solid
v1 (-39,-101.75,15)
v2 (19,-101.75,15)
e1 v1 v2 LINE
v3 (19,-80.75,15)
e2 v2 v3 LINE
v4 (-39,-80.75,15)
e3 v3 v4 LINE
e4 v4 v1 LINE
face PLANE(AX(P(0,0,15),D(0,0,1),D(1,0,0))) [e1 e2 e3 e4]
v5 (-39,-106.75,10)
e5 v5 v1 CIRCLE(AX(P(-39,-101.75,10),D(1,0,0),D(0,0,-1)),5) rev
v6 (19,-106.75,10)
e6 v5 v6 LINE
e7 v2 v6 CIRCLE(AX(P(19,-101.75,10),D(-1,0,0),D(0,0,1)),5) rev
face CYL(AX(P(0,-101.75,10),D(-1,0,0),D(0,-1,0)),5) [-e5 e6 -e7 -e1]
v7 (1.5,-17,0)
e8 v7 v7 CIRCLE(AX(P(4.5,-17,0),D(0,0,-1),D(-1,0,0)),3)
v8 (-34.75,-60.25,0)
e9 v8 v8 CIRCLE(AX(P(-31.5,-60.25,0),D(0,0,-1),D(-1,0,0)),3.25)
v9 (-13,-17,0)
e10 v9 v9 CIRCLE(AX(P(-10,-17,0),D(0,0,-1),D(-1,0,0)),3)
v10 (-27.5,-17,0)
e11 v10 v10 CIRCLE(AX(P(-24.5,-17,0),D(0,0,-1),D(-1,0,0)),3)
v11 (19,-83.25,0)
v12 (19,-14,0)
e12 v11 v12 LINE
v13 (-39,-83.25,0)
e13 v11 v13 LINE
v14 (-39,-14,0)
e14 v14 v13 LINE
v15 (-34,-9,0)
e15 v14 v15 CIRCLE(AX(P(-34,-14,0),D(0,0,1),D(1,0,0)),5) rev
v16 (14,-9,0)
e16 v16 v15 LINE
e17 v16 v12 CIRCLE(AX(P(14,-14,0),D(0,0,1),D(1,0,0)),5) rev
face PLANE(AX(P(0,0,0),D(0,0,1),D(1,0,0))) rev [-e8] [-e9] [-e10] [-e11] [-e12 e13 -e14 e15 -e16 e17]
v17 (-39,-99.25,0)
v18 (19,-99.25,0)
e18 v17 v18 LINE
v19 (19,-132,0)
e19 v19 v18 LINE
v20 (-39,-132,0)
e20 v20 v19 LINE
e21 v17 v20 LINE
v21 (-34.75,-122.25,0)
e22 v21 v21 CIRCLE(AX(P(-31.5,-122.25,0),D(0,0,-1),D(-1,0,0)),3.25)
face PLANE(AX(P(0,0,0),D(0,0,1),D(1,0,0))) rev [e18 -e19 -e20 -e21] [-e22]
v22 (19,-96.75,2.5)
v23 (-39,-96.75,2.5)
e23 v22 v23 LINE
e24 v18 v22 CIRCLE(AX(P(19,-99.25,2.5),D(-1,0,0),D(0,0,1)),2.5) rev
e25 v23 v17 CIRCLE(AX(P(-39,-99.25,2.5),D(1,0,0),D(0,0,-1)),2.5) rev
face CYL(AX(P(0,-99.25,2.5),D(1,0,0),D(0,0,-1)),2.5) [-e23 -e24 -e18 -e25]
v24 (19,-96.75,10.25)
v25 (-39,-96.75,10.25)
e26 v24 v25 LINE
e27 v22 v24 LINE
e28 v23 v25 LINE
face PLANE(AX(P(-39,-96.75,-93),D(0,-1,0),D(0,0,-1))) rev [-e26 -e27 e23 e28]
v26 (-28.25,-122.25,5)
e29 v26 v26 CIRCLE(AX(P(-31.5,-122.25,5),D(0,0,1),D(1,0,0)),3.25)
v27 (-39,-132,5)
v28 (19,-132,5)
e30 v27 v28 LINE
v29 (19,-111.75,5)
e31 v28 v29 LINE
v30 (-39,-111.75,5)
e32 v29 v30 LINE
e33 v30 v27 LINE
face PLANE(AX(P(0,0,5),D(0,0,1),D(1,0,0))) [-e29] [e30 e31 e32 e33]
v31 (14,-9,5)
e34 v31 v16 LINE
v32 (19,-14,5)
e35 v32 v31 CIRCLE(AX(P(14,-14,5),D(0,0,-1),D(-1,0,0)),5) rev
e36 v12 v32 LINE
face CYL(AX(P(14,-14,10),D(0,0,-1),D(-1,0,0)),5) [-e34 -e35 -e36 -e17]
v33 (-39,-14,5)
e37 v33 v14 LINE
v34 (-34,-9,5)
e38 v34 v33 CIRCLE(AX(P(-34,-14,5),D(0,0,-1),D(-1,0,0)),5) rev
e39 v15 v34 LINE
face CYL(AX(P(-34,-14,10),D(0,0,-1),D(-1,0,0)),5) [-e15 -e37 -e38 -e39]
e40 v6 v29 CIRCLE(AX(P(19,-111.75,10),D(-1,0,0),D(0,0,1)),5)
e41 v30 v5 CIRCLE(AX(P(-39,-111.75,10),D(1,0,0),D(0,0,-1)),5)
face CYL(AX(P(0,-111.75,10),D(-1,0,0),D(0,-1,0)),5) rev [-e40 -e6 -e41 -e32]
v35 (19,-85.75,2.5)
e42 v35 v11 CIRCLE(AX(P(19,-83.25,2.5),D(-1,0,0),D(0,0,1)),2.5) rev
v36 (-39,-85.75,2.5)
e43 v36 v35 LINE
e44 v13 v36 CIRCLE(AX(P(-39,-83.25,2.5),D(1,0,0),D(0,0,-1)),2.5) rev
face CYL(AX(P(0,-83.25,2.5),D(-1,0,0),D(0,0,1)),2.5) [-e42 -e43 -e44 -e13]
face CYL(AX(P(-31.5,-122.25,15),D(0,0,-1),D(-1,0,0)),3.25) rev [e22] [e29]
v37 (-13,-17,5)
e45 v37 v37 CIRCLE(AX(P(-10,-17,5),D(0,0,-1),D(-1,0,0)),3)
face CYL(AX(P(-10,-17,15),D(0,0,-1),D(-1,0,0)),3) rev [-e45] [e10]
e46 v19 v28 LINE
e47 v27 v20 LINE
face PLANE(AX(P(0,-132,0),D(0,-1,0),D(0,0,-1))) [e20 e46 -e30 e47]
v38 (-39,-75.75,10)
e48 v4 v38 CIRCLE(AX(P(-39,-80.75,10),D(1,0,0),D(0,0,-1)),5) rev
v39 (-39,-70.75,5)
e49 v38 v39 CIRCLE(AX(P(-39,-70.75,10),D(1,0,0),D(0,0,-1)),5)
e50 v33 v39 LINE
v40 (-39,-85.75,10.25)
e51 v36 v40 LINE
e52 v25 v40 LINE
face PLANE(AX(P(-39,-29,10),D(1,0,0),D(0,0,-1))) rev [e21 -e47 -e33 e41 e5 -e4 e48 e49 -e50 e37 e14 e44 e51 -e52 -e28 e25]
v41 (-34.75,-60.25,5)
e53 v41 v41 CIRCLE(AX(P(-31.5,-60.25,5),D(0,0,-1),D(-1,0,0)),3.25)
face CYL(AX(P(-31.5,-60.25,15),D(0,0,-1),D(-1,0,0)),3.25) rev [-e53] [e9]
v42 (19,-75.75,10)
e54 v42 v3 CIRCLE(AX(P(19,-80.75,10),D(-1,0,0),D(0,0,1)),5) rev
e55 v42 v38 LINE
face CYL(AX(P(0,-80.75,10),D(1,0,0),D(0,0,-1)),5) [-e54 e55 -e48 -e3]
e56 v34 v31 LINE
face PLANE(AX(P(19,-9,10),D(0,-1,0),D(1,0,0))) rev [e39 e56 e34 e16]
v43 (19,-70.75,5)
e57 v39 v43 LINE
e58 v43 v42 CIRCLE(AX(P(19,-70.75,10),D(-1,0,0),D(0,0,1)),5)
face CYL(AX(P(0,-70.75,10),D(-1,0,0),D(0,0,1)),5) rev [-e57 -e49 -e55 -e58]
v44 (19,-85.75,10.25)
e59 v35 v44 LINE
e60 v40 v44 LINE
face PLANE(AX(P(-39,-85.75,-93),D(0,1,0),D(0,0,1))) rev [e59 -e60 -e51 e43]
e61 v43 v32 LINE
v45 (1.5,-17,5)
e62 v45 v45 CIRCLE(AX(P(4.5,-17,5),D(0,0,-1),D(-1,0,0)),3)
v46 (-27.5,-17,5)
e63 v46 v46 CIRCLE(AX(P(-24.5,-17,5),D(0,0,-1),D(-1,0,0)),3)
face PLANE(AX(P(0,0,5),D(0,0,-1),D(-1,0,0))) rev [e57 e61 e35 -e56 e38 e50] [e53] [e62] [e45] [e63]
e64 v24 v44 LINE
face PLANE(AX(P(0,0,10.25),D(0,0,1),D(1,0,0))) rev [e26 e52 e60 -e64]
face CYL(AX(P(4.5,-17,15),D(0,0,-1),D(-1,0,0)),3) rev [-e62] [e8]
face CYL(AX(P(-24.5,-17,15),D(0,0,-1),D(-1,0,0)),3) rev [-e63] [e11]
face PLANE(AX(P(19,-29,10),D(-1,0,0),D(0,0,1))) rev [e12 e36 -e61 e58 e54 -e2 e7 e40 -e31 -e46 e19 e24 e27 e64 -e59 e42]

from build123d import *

# Parameters (mm, degrees)
SKETCH1_W           = 58
SKETCH1_H           = 20
BOSS_EXTRUDE1_DEPTH = 10
SKETCH2_W           = 58
SKETCH2_H           = 10
BOSS_EXTRUDE3_DEPTH = 103
SKETCH4_W           = 58
SKETCH4_H           = 11
CUT_EXTRUDE2_DEPTH  = 103
SKETCH5_W           = 58
SKETCH5_H           = 31
BOSS_EXTRUDE4_DEPTH = 5
SKETCH6_W           = 58
SKETCH6_H           = 66.819677738
SKETCH6_W_2         = 58.198762754
SKETCH6_H_2         = 25.25
CUT_EXTRUDE3_DEPTH  = 5
FILLET2_START       = -39
FILLET2_DEPTH       = 58
FILLET2_2_DEPTH     = 58
FILLET3_R           = 2.5
SKETCH7_W           = 58.063983185
SKETCH7_H           = 11
CUT_EXTRUDE4_DEPTH  = 0.25
SKETCH9_R           = 3
SKETCH9_R_2         = 3.25
CUT_EXTRUDE5_DEPTH  = 139.455769111
FILLET4_R           = 5


with BuildPart() as part:
    # Sketch1 → Boss-Extrude1 (new body)
    with BuildSketch(Plane.XY):
        with Locations((-10, -19)):
            Rectangle(SKETCH1_W, SKETCH1_H)
    extrude(amount=BOSS_EXTRUDE1_DEPTH)

    # Sketch2 → Boss-Extrude3 (add)
    with BuildSketch(Plane.XZ.offset(29)):
        with Locations((-10, 5)):
            Rectangle(SKETCH2_W, SKETCH2_H)
    extrude(amount=BOSS_EXTRUDE3_DEPTH)

    # Sketch4 → Cut-Extrude2 (cut)
    with BuildSketch(Plane.XY.offset(10)):
        with Locations((-10, -91.25)):
            Rectangle(SKETCH4_W, SKETCH4_H)
    extrude(amount=-CUT_EXTRUDE2_DEPTH, mode=Mode.SUBTRACT)


with BuildPart() as cut_extrude2_piece_1:
    # of the separate pieces the step leaves, piece 1, a body of its own (cut_extrude2_pieces)
    add(part.part.solids().sort_by_distance((-39, -9, 0))[0])



with BuildPart() as cut_extrude2_piece_2:
    # of the separate pieces the step leaves, piece 2, a body of its own (cut_extrude2_pieces)
    add(part.part.solids().sort_by_distance((-39, -96.75, 10))[0])


with BuildPart() as cut_extrude2_piece_1_1:
    add(cut_extrude2_piece_1.part)

    add(cut_extrude2_piece_2.part)  # Boss-Extrude4 merges Cut-Extrude2 piece 2
    # Sketch5 → Boss-Extrude4 (add)
    with BuildSketch(Plane.XY.offset(10)):
        with Locations((-10, -91.25)):
            Rectangle(SKETCH5_W, SKETCH5_H)
    extrude(amount=BOSS_EXTRUDE4_DEPTH)

    # Sketch6 → Cut-Extrude3 (cut)
    with BuildSketch(Plane.XY.offset(10)):
        with Locations((-10, -42.340161131)):
            Rectangle(SKETCH6_W, SKETCH6_H)
        with Locations((-9.900618623, -119.375)):
            Rectangle(SKETCH6_W_2, SKETCH6_H_2)
    extrude(amount=-CUT_EXTRUDE3_DEPTH, mode=Mode.SUBTRACT)

    # Fillet2: read off the stored shape, not the designer's step
    # Fillet2 outline → Fillet2 (cut)
    with BuildSketch(Plane.YZ.offset(FILLET2_START)):
        with BuildLine():
            ThreePointArc((-106.75, 10), (-105.285533906, 13.535533906), (-101.75, 15))
            Line((-101.75, 15), (-106.75, 15))
            Line((-106.75, 15), (-106.75, 10))
        make_face()
        with BuildLine():
            ThreePointArc((-80.75, 15), (-77.214466094, 13.535533906), (-75.75, 10))
            Line((-75.75, 10), (-75.75, 15))
            Line((-75.75, 15), (-80.75, 15))
        make_face()
    extrude(amount=FILLET2_DEPTH, mode=Mode.SUBTRACT)

    # Fillet2 2 outline → Fillet2 2 (add)
    with BuildSketch(Plane.YZ.offset(FILLET2_START)):
        with BuildLine():
            Line((-75.75, 5), (-70.75, 5))
            ThreePointArc((-70.75, 5), (-74.285533906, 6.464466094), (-75.75, 10))
            Line((-75.75, 10), (-75.75, 5))
        make_face()
        with BuildLine():
            Line((-106.75, 5), (-106.75, 10))
            ThreePointArc((-106.75, 10), (-108.214466094, 6.464466094), (-111.75, 5))
            Line((-111.75, 5), (-106.75, 5))
        make_face()
    extrude(amount=FILLET2_2_DEPTH)

    # Fillet3
    fillet3_edges = [cut_extrude2_piece_1_1.edges().sort_by_distance(p)[0] for p in [
        (-10, -85.75, 0),
        (-10, -96.75, 0),
    ]]
    fillet(fillet3_edges, radius=FILLET3_R)

    # Sketch7 → Cut-Extrude4 (cut)
    with BuildSketch(Plane(origin=(0, 0, 10), x_dir=(-1, 0, 0), z_dir=(0, 0, -1))):
        with Locations((9.968008407, -91.25)):
            Rectangle(SKETCH7_W, SKETCH7_H)
    extrude(amount=-CUT_EXTRUDE4_DEPTH, mode=Mode.SUBTRACT)

    # Sketch9 → Cut-Extrude5 (cut, through all)
    with BuildSketch(Plane(origin=(0, 0, 0), x_dir=(-1, 0, 0), z_dir=(0, 0, -1))):
        with Locations((24.5, -17)):
            Circle(SKETCH9_R)
        with Locations((10, -17)):
            Circle(SKETCH9_R)
        with Locations((-4.5, -17)):
            Circle(SKETCH9_R)
        with Locations((31.5, -60.25)):
            Circle(SKETCH9_R_2)
        with Locations((31.5, -122.25)):
            Circle(SKETCH9_R_2)
    extrude(amount=-CUT_EXTRUDE5_DEPTH, mode=Mode.SUBTRACT)

    # Fillet4
    fillet4_edges = [cut_extrude2_piece_1_1.edges().sort_by_distance(p)[0] for p in [
        (-39, -9, 2.5),
        (19, -9, 2.5),
    ]]
    fillet(fillet4_edges, radius=FILLET4_R)


solid = cut_extrude2_piece_1_1.part
